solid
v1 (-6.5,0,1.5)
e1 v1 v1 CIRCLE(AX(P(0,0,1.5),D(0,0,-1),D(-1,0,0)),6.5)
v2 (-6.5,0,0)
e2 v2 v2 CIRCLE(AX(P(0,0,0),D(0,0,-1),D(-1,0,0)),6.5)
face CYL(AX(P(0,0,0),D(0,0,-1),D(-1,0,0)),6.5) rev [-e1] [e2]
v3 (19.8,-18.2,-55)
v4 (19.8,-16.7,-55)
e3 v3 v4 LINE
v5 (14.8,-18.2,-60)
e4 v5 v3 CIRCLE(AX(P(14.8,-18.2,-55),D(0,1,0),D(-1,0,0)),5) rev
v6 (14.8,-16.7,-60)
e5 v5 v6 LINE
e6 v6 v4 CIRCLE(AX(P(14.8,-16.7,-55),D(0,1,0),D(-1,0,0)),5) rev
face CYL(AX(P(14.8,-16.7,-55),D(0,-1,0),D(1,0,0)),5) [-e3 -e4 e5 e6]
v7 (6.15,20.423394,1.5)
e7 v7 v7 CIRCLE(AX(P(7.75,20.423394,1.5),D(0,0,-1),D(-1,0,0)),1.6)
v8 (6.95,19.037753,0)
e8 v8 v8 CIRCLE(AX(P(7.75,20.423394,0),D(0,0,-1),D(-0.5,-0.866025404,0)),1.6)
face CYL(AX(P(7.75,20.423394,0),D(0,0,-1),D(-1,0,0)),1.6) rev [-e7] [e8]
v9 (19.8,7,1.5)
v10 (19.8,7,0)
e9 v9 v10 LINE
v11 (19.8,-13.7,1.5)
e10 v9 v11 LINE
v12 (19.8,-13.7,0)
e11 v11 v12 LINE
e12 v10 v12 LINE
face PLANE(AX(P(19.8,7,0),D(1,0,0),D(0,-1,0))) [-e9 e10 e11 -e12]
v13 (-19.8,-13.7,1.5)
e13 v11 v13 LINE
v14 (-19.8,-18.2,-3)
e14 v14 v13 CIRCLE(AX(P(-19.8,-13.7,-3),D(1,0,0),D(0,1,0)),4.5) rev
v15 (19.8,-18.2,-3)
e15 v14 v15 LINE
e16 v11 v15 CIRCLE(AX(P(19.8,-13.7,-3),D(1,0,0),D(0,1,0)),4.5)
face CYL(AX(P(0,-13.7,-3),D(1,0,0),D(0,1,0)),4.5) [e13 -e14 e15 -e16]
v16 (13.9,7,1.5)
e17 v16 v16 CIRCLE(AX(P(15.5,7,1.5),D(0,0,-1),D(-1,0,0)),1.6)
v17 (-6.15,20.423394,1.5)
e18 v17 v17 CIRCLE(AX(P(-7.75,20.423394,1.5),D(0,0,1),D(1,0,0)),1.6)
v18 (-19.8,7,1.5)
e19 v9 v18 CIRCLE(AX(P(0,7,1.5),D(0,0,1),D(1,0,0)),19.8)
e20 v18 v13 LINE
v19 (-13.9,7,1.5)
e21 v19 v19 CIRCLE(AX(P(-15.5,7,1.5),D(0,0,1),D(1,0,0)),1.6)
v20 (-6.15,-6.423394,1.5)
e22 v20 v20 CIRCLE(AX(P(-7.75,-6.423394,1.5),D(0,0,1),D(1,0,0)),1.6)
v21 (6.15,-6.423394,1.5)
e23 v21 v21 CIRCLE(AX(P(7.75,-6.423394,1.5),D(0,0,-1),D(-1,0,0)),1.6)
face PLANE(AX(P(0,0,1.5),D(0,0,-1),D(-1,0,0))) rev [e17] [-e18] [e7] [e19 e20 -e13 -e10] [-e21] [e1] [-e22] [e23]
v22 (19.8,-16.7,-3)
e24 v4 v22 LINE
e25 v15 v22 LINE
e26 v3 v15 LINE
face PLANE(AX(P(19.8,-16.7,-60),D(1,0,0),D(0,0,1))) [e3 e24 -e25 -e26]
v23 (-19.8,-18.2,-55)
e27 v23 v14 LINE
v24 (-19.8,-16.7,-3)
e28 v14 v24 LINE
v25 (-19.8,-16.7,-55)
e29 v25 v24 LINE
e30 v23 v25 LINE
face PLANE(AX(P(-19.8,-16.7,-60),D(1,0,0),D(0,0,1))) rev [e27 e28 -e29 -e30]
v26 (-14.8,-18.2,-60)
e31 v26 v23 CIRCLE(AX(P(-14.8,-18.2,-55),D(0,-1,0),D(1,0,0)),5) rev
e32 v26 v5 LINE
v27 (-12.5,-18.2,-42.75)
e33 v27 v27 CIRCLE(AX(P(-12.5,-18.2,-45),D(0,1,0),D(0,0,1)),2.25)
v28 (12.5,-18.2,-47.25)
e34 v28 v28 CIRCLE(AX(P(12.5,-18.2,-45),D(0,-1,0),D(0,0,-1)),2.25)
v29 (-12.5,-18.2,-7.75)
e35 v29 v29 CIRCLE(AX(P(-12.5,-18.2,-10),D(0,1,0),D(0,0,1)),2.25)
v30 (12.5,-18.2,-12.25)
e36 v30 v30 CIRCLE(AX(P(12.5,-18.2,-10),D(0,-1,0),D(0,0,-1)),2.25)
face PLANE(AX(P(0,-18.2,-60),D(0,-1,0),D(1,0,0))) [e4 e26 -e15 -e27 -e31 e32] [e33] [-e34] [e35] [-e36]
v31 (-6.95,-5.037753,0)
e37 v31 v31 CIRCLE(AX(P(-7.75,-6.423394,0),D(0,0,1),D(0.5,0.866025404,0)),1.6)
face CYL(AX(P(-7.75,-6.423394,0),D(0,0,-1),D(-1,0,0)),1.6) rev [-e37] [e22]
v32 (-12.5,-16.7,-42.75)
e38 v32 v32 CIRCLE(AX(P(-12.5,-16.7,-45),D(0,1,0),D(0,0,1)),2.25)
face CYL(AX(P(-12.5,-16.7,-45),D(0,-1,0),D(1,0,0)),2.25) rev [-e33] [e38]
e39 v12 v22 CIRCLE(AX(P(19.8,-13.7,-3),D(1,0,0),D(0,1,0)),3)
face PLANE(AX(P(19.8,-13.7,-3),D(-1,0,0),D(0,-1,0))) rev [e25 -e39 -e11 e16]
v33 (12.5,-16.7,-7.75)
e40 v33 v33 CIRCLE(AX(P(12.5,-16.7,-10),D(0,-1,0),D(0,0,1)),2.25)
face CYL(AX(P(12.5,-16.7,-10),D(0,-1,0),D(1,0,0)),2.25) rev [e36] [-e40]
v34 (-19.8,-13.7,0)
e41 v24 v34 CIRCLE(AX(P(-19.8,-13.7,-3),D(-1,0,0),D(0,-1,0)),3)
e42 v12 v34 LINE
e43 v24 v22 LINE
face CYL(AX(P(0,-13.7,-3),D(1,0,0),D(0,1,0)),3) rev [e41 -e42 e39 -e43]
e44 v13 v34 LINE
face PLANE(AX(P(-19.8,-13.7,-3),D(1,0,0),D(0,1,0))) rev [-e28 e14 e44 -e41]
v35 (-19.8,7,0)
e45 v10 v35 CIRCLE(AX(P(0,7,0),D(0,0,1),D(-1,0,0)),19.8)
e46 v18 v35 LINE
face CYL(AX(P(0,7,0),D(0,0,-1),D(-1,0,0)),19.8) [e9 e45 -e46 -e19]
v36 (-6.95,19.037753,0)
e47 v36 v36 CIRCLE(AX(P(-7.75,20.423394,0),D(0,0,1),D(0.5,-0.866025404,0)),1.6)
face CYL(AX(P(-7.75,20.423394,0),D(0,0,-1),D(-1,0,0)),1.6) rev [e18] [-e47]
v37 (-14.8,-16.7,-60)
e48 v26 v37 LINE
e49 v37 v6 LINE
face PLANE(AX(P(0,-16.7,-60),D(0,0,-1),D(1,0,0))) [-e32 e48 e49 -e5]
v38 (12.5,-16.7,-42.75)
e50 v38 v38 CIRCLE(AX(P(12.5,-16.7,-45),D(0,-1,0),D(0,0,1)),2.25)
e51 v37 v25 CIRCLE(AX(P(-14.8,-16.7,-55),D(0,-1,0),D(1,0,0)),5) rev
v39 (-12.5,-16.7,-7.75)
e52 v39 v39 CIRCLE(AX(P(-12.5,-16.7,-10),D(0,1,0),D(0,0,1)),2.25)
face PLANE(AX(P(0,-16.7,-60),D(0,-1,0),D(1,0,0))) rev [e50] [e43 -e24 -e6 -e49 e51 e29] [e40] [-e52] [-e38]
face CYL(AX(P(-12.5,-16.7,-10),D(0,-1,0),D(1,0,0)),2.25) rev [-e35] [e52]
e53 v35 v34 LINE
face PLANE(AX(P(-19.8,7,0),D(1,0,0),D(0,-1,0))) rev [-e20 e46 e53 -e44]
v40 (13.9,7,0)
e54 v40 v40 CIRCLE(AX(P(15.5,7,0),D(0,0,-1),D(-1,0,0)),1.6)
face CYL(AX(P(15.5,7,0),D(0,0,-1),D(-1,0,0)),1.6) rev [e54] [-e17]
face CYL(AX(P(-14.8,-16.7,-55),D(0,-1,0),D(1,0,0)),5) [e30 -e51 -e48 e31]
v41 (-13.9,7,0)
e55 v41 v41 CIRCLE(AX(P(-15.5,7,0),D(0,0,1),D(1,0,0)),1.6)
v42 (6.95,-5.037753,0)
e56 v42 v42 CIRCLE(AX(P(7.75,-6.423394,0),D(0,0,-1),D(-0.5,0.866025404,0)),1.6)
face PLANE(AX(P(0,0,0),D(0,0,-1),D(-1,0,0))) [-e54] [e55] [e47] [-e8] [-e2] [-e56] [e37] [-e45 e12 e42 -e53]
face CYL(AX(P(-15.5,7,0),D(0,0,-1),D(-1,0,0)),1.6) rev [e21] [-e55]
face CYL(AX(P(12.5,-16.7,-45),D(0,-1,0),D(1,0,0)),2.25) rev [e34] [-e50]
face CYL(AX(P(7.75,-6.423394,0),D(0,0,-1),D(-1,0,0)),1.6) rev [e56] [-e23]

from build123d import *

# Parameters (mm, degrees)
BOSS_EXTRUDE1_DEPTH                     = 1.5
SKETCH2_R                               = 1.6
MOT_MNT_SCREW_HOLE_DEPTH                = 34.354609876
MOT_MNT_SCREW_HOLES_COUNT               = 2
MOT_MNT_SCREW_HOLES_ANGLE               = 60
MOT_MNT_SCREW_HOLES_THE_OTHER_WAY_COUNT = 2
MOT_MNT_SCREW_HOLES_THE_OTHER_WAY_ANGLE = 60
SKETCH3_W                               = 19.8
SKETCH3_H                               = 1.5
BASE_FLANGE_DEPTH                       = 60
SKETCH4_R                               = 2.25
BASE_MNT_SCREW_HOLES_DEPTH              = 77.709125924
FILLET1_R                               = 5
CONVERT_SOLID2_START                    = -19.8
CONVERT_SOLID2_DEPTH                    = 39.6
CONVERT_SOLID2_2_DEPTH                  = 39.6


# Read off the part's stored shape, not the designer's step: Convert-Solid2
with BuildPart() as part:
    # Sketch1 → Boss-Extrude1 (new body)
    with BuildSketch(Plane.XY):
        with BuildLine():
            Line((0, 26.8), (0, 6.5))
            ThreePointArc((0, 6.5), (-6.5, 0), (0, -6.5))
            Line((0, -6.5), (0, -18.2))
            Line((0, -18.2), (-19.8, -18.2))
            Line((-19.8, -18.2), (-19.8, 7))
            ThreePointArc((-19.8, 7), (-14.000714267, 21.000714267), (0, 26.8))
        make_face()
    extrude(amount=BOSS_EXTRUDE1_DEPTH)

    # Sketch2 → mot mnt screw hole (cut, through all)
    with BuildSketch(Plane.XY.offset(1.5)):
        with Locations((-15.5, 7)):
            Circle(SKETCH2_R)
    mot_mnt_screw_hole = extrude(amount=-MOT_MNT_SCREW_HOLE_DEPTH, mode=Mode.SUBTRACT)

    # mot mnt screw holes: mot mnt screw hole ×2 about axis
    mot_mnt_screw_holes_axis = Axis((0, 7, 1.5), (0, 0, -1))
    for i in range(1, MOT_MNT_SCREW_HOLES_COUNT):
        add(mot_mnt_screw_hole.rotate(mot_mnt_screw_holes_axis, i * MOT_MNT_SCREW_HOLES_ANGLE / (MOT_MNT_SCREW_HOLES_COUNT - 1)), mode=Mode.SUBTRACT)

    # mot mnt screw holes the other way: mot mnt screw hole ×2 about axis
    mot_mnt_screw_holes_the_other_way_axis = Axis((0, 7, 1.5), (0, 0, 1))
    for i in range(1, MOT_MNT_SCREW_HOLES_THE_OTHER_WAY_COUNT):
        add(mot_mnt_screw_hole.rotate(mot_mnt_screw_holes_the_other_way_axis, i * MOT_MNT_SCREW_HOLES_THE_OTHER_WAY_ANGLE / (MOT_MNT_SCREW_HOLES_THE_OTHER_WAY_COUNT - 1)), mode=Mode.SUBTRACT)

    # Sketch3 → base flange (add)
    with BuildSketch(Plane(origin=(0, 0, 0), x_dir=(-1, 0, 0), z_dir=(0, 0, -1))):
        with Locations((9.9, -17.45)):
            Rectangle(SKETCH3_W, SKETCH3_H)
    extrude(amount=BASE_FLANGE_DEPTH)

    # Sketch4 → base mnt screw holes (cut, through all)
    with BuildSketch(Plane(origin=(0, -16.7, 0), x_dir=(1, 0, 0), z_dir=(0, 1, 0))):
        with Locations(Location((-12.5, 10, 0), (0, 0, 270))):
            Circle(SKETCH4_R)
        with Locations(Location((-12.5, 45, 0), (0, 0, 270))):
            Circle(SKETCH4_R)
    extrude(amount=-BASE_MNT_SCREW_HOLES_DEPTH, mode=Mode.SUBTRACT)

    # Fillet1
    fillet1_edges = [part.edges().sort_by_distance(p)[0] for p in [
        (-19.8, -17.45, -60),
    ]]
    fillet(fillet1_edges, radius=FILLET1_R)

    # Mirror1: part across plane


with BuildPart() as part_1:
    add(part.part)
    add(part.part.mirror(Plane(origin=(0, 0, 0), x_dir=(0, 0, 1), z_dir=(1, 0, 0))))

    # Convert-Solid2 outline → Convert-Solid2 (cut)
    with BuildSketch(Plane.YZ.offset(CONVERT_SOLID2_START)):
        with BuildLine():
            ThreePointArc((-18.2, -3), (-16.881980515, 0.181980515), (-13.7, 1.5))
            Line((-13.7, 1.5), (-18.2, 1.5))
            Line((-18.2, 1.5), (-18.2, -3))
        make_face()
    extrude(amount=CONVERT_SOLID2_DEPTH, mode=Mode.SUBTRACT)

    # Convert-Solid2 2 outline → Convert-Solid2 2 (add)
    with BuildSketch(Plane.YZ.offset(CONVERT_SOLID2_START)):
        with BuildLine():
            ThreePointArc((-16.7, -3), (-15.821320344, -0.878679656), (-13.7, 0))
            Line((-13.7, 0), (-16.7, 0))
            Line((-16.7, 0), (-16.7, -3))
        make_face()
    extrude(amount=CONVERT_SOLID2_2_DEPTH)


solid = part_1.part
